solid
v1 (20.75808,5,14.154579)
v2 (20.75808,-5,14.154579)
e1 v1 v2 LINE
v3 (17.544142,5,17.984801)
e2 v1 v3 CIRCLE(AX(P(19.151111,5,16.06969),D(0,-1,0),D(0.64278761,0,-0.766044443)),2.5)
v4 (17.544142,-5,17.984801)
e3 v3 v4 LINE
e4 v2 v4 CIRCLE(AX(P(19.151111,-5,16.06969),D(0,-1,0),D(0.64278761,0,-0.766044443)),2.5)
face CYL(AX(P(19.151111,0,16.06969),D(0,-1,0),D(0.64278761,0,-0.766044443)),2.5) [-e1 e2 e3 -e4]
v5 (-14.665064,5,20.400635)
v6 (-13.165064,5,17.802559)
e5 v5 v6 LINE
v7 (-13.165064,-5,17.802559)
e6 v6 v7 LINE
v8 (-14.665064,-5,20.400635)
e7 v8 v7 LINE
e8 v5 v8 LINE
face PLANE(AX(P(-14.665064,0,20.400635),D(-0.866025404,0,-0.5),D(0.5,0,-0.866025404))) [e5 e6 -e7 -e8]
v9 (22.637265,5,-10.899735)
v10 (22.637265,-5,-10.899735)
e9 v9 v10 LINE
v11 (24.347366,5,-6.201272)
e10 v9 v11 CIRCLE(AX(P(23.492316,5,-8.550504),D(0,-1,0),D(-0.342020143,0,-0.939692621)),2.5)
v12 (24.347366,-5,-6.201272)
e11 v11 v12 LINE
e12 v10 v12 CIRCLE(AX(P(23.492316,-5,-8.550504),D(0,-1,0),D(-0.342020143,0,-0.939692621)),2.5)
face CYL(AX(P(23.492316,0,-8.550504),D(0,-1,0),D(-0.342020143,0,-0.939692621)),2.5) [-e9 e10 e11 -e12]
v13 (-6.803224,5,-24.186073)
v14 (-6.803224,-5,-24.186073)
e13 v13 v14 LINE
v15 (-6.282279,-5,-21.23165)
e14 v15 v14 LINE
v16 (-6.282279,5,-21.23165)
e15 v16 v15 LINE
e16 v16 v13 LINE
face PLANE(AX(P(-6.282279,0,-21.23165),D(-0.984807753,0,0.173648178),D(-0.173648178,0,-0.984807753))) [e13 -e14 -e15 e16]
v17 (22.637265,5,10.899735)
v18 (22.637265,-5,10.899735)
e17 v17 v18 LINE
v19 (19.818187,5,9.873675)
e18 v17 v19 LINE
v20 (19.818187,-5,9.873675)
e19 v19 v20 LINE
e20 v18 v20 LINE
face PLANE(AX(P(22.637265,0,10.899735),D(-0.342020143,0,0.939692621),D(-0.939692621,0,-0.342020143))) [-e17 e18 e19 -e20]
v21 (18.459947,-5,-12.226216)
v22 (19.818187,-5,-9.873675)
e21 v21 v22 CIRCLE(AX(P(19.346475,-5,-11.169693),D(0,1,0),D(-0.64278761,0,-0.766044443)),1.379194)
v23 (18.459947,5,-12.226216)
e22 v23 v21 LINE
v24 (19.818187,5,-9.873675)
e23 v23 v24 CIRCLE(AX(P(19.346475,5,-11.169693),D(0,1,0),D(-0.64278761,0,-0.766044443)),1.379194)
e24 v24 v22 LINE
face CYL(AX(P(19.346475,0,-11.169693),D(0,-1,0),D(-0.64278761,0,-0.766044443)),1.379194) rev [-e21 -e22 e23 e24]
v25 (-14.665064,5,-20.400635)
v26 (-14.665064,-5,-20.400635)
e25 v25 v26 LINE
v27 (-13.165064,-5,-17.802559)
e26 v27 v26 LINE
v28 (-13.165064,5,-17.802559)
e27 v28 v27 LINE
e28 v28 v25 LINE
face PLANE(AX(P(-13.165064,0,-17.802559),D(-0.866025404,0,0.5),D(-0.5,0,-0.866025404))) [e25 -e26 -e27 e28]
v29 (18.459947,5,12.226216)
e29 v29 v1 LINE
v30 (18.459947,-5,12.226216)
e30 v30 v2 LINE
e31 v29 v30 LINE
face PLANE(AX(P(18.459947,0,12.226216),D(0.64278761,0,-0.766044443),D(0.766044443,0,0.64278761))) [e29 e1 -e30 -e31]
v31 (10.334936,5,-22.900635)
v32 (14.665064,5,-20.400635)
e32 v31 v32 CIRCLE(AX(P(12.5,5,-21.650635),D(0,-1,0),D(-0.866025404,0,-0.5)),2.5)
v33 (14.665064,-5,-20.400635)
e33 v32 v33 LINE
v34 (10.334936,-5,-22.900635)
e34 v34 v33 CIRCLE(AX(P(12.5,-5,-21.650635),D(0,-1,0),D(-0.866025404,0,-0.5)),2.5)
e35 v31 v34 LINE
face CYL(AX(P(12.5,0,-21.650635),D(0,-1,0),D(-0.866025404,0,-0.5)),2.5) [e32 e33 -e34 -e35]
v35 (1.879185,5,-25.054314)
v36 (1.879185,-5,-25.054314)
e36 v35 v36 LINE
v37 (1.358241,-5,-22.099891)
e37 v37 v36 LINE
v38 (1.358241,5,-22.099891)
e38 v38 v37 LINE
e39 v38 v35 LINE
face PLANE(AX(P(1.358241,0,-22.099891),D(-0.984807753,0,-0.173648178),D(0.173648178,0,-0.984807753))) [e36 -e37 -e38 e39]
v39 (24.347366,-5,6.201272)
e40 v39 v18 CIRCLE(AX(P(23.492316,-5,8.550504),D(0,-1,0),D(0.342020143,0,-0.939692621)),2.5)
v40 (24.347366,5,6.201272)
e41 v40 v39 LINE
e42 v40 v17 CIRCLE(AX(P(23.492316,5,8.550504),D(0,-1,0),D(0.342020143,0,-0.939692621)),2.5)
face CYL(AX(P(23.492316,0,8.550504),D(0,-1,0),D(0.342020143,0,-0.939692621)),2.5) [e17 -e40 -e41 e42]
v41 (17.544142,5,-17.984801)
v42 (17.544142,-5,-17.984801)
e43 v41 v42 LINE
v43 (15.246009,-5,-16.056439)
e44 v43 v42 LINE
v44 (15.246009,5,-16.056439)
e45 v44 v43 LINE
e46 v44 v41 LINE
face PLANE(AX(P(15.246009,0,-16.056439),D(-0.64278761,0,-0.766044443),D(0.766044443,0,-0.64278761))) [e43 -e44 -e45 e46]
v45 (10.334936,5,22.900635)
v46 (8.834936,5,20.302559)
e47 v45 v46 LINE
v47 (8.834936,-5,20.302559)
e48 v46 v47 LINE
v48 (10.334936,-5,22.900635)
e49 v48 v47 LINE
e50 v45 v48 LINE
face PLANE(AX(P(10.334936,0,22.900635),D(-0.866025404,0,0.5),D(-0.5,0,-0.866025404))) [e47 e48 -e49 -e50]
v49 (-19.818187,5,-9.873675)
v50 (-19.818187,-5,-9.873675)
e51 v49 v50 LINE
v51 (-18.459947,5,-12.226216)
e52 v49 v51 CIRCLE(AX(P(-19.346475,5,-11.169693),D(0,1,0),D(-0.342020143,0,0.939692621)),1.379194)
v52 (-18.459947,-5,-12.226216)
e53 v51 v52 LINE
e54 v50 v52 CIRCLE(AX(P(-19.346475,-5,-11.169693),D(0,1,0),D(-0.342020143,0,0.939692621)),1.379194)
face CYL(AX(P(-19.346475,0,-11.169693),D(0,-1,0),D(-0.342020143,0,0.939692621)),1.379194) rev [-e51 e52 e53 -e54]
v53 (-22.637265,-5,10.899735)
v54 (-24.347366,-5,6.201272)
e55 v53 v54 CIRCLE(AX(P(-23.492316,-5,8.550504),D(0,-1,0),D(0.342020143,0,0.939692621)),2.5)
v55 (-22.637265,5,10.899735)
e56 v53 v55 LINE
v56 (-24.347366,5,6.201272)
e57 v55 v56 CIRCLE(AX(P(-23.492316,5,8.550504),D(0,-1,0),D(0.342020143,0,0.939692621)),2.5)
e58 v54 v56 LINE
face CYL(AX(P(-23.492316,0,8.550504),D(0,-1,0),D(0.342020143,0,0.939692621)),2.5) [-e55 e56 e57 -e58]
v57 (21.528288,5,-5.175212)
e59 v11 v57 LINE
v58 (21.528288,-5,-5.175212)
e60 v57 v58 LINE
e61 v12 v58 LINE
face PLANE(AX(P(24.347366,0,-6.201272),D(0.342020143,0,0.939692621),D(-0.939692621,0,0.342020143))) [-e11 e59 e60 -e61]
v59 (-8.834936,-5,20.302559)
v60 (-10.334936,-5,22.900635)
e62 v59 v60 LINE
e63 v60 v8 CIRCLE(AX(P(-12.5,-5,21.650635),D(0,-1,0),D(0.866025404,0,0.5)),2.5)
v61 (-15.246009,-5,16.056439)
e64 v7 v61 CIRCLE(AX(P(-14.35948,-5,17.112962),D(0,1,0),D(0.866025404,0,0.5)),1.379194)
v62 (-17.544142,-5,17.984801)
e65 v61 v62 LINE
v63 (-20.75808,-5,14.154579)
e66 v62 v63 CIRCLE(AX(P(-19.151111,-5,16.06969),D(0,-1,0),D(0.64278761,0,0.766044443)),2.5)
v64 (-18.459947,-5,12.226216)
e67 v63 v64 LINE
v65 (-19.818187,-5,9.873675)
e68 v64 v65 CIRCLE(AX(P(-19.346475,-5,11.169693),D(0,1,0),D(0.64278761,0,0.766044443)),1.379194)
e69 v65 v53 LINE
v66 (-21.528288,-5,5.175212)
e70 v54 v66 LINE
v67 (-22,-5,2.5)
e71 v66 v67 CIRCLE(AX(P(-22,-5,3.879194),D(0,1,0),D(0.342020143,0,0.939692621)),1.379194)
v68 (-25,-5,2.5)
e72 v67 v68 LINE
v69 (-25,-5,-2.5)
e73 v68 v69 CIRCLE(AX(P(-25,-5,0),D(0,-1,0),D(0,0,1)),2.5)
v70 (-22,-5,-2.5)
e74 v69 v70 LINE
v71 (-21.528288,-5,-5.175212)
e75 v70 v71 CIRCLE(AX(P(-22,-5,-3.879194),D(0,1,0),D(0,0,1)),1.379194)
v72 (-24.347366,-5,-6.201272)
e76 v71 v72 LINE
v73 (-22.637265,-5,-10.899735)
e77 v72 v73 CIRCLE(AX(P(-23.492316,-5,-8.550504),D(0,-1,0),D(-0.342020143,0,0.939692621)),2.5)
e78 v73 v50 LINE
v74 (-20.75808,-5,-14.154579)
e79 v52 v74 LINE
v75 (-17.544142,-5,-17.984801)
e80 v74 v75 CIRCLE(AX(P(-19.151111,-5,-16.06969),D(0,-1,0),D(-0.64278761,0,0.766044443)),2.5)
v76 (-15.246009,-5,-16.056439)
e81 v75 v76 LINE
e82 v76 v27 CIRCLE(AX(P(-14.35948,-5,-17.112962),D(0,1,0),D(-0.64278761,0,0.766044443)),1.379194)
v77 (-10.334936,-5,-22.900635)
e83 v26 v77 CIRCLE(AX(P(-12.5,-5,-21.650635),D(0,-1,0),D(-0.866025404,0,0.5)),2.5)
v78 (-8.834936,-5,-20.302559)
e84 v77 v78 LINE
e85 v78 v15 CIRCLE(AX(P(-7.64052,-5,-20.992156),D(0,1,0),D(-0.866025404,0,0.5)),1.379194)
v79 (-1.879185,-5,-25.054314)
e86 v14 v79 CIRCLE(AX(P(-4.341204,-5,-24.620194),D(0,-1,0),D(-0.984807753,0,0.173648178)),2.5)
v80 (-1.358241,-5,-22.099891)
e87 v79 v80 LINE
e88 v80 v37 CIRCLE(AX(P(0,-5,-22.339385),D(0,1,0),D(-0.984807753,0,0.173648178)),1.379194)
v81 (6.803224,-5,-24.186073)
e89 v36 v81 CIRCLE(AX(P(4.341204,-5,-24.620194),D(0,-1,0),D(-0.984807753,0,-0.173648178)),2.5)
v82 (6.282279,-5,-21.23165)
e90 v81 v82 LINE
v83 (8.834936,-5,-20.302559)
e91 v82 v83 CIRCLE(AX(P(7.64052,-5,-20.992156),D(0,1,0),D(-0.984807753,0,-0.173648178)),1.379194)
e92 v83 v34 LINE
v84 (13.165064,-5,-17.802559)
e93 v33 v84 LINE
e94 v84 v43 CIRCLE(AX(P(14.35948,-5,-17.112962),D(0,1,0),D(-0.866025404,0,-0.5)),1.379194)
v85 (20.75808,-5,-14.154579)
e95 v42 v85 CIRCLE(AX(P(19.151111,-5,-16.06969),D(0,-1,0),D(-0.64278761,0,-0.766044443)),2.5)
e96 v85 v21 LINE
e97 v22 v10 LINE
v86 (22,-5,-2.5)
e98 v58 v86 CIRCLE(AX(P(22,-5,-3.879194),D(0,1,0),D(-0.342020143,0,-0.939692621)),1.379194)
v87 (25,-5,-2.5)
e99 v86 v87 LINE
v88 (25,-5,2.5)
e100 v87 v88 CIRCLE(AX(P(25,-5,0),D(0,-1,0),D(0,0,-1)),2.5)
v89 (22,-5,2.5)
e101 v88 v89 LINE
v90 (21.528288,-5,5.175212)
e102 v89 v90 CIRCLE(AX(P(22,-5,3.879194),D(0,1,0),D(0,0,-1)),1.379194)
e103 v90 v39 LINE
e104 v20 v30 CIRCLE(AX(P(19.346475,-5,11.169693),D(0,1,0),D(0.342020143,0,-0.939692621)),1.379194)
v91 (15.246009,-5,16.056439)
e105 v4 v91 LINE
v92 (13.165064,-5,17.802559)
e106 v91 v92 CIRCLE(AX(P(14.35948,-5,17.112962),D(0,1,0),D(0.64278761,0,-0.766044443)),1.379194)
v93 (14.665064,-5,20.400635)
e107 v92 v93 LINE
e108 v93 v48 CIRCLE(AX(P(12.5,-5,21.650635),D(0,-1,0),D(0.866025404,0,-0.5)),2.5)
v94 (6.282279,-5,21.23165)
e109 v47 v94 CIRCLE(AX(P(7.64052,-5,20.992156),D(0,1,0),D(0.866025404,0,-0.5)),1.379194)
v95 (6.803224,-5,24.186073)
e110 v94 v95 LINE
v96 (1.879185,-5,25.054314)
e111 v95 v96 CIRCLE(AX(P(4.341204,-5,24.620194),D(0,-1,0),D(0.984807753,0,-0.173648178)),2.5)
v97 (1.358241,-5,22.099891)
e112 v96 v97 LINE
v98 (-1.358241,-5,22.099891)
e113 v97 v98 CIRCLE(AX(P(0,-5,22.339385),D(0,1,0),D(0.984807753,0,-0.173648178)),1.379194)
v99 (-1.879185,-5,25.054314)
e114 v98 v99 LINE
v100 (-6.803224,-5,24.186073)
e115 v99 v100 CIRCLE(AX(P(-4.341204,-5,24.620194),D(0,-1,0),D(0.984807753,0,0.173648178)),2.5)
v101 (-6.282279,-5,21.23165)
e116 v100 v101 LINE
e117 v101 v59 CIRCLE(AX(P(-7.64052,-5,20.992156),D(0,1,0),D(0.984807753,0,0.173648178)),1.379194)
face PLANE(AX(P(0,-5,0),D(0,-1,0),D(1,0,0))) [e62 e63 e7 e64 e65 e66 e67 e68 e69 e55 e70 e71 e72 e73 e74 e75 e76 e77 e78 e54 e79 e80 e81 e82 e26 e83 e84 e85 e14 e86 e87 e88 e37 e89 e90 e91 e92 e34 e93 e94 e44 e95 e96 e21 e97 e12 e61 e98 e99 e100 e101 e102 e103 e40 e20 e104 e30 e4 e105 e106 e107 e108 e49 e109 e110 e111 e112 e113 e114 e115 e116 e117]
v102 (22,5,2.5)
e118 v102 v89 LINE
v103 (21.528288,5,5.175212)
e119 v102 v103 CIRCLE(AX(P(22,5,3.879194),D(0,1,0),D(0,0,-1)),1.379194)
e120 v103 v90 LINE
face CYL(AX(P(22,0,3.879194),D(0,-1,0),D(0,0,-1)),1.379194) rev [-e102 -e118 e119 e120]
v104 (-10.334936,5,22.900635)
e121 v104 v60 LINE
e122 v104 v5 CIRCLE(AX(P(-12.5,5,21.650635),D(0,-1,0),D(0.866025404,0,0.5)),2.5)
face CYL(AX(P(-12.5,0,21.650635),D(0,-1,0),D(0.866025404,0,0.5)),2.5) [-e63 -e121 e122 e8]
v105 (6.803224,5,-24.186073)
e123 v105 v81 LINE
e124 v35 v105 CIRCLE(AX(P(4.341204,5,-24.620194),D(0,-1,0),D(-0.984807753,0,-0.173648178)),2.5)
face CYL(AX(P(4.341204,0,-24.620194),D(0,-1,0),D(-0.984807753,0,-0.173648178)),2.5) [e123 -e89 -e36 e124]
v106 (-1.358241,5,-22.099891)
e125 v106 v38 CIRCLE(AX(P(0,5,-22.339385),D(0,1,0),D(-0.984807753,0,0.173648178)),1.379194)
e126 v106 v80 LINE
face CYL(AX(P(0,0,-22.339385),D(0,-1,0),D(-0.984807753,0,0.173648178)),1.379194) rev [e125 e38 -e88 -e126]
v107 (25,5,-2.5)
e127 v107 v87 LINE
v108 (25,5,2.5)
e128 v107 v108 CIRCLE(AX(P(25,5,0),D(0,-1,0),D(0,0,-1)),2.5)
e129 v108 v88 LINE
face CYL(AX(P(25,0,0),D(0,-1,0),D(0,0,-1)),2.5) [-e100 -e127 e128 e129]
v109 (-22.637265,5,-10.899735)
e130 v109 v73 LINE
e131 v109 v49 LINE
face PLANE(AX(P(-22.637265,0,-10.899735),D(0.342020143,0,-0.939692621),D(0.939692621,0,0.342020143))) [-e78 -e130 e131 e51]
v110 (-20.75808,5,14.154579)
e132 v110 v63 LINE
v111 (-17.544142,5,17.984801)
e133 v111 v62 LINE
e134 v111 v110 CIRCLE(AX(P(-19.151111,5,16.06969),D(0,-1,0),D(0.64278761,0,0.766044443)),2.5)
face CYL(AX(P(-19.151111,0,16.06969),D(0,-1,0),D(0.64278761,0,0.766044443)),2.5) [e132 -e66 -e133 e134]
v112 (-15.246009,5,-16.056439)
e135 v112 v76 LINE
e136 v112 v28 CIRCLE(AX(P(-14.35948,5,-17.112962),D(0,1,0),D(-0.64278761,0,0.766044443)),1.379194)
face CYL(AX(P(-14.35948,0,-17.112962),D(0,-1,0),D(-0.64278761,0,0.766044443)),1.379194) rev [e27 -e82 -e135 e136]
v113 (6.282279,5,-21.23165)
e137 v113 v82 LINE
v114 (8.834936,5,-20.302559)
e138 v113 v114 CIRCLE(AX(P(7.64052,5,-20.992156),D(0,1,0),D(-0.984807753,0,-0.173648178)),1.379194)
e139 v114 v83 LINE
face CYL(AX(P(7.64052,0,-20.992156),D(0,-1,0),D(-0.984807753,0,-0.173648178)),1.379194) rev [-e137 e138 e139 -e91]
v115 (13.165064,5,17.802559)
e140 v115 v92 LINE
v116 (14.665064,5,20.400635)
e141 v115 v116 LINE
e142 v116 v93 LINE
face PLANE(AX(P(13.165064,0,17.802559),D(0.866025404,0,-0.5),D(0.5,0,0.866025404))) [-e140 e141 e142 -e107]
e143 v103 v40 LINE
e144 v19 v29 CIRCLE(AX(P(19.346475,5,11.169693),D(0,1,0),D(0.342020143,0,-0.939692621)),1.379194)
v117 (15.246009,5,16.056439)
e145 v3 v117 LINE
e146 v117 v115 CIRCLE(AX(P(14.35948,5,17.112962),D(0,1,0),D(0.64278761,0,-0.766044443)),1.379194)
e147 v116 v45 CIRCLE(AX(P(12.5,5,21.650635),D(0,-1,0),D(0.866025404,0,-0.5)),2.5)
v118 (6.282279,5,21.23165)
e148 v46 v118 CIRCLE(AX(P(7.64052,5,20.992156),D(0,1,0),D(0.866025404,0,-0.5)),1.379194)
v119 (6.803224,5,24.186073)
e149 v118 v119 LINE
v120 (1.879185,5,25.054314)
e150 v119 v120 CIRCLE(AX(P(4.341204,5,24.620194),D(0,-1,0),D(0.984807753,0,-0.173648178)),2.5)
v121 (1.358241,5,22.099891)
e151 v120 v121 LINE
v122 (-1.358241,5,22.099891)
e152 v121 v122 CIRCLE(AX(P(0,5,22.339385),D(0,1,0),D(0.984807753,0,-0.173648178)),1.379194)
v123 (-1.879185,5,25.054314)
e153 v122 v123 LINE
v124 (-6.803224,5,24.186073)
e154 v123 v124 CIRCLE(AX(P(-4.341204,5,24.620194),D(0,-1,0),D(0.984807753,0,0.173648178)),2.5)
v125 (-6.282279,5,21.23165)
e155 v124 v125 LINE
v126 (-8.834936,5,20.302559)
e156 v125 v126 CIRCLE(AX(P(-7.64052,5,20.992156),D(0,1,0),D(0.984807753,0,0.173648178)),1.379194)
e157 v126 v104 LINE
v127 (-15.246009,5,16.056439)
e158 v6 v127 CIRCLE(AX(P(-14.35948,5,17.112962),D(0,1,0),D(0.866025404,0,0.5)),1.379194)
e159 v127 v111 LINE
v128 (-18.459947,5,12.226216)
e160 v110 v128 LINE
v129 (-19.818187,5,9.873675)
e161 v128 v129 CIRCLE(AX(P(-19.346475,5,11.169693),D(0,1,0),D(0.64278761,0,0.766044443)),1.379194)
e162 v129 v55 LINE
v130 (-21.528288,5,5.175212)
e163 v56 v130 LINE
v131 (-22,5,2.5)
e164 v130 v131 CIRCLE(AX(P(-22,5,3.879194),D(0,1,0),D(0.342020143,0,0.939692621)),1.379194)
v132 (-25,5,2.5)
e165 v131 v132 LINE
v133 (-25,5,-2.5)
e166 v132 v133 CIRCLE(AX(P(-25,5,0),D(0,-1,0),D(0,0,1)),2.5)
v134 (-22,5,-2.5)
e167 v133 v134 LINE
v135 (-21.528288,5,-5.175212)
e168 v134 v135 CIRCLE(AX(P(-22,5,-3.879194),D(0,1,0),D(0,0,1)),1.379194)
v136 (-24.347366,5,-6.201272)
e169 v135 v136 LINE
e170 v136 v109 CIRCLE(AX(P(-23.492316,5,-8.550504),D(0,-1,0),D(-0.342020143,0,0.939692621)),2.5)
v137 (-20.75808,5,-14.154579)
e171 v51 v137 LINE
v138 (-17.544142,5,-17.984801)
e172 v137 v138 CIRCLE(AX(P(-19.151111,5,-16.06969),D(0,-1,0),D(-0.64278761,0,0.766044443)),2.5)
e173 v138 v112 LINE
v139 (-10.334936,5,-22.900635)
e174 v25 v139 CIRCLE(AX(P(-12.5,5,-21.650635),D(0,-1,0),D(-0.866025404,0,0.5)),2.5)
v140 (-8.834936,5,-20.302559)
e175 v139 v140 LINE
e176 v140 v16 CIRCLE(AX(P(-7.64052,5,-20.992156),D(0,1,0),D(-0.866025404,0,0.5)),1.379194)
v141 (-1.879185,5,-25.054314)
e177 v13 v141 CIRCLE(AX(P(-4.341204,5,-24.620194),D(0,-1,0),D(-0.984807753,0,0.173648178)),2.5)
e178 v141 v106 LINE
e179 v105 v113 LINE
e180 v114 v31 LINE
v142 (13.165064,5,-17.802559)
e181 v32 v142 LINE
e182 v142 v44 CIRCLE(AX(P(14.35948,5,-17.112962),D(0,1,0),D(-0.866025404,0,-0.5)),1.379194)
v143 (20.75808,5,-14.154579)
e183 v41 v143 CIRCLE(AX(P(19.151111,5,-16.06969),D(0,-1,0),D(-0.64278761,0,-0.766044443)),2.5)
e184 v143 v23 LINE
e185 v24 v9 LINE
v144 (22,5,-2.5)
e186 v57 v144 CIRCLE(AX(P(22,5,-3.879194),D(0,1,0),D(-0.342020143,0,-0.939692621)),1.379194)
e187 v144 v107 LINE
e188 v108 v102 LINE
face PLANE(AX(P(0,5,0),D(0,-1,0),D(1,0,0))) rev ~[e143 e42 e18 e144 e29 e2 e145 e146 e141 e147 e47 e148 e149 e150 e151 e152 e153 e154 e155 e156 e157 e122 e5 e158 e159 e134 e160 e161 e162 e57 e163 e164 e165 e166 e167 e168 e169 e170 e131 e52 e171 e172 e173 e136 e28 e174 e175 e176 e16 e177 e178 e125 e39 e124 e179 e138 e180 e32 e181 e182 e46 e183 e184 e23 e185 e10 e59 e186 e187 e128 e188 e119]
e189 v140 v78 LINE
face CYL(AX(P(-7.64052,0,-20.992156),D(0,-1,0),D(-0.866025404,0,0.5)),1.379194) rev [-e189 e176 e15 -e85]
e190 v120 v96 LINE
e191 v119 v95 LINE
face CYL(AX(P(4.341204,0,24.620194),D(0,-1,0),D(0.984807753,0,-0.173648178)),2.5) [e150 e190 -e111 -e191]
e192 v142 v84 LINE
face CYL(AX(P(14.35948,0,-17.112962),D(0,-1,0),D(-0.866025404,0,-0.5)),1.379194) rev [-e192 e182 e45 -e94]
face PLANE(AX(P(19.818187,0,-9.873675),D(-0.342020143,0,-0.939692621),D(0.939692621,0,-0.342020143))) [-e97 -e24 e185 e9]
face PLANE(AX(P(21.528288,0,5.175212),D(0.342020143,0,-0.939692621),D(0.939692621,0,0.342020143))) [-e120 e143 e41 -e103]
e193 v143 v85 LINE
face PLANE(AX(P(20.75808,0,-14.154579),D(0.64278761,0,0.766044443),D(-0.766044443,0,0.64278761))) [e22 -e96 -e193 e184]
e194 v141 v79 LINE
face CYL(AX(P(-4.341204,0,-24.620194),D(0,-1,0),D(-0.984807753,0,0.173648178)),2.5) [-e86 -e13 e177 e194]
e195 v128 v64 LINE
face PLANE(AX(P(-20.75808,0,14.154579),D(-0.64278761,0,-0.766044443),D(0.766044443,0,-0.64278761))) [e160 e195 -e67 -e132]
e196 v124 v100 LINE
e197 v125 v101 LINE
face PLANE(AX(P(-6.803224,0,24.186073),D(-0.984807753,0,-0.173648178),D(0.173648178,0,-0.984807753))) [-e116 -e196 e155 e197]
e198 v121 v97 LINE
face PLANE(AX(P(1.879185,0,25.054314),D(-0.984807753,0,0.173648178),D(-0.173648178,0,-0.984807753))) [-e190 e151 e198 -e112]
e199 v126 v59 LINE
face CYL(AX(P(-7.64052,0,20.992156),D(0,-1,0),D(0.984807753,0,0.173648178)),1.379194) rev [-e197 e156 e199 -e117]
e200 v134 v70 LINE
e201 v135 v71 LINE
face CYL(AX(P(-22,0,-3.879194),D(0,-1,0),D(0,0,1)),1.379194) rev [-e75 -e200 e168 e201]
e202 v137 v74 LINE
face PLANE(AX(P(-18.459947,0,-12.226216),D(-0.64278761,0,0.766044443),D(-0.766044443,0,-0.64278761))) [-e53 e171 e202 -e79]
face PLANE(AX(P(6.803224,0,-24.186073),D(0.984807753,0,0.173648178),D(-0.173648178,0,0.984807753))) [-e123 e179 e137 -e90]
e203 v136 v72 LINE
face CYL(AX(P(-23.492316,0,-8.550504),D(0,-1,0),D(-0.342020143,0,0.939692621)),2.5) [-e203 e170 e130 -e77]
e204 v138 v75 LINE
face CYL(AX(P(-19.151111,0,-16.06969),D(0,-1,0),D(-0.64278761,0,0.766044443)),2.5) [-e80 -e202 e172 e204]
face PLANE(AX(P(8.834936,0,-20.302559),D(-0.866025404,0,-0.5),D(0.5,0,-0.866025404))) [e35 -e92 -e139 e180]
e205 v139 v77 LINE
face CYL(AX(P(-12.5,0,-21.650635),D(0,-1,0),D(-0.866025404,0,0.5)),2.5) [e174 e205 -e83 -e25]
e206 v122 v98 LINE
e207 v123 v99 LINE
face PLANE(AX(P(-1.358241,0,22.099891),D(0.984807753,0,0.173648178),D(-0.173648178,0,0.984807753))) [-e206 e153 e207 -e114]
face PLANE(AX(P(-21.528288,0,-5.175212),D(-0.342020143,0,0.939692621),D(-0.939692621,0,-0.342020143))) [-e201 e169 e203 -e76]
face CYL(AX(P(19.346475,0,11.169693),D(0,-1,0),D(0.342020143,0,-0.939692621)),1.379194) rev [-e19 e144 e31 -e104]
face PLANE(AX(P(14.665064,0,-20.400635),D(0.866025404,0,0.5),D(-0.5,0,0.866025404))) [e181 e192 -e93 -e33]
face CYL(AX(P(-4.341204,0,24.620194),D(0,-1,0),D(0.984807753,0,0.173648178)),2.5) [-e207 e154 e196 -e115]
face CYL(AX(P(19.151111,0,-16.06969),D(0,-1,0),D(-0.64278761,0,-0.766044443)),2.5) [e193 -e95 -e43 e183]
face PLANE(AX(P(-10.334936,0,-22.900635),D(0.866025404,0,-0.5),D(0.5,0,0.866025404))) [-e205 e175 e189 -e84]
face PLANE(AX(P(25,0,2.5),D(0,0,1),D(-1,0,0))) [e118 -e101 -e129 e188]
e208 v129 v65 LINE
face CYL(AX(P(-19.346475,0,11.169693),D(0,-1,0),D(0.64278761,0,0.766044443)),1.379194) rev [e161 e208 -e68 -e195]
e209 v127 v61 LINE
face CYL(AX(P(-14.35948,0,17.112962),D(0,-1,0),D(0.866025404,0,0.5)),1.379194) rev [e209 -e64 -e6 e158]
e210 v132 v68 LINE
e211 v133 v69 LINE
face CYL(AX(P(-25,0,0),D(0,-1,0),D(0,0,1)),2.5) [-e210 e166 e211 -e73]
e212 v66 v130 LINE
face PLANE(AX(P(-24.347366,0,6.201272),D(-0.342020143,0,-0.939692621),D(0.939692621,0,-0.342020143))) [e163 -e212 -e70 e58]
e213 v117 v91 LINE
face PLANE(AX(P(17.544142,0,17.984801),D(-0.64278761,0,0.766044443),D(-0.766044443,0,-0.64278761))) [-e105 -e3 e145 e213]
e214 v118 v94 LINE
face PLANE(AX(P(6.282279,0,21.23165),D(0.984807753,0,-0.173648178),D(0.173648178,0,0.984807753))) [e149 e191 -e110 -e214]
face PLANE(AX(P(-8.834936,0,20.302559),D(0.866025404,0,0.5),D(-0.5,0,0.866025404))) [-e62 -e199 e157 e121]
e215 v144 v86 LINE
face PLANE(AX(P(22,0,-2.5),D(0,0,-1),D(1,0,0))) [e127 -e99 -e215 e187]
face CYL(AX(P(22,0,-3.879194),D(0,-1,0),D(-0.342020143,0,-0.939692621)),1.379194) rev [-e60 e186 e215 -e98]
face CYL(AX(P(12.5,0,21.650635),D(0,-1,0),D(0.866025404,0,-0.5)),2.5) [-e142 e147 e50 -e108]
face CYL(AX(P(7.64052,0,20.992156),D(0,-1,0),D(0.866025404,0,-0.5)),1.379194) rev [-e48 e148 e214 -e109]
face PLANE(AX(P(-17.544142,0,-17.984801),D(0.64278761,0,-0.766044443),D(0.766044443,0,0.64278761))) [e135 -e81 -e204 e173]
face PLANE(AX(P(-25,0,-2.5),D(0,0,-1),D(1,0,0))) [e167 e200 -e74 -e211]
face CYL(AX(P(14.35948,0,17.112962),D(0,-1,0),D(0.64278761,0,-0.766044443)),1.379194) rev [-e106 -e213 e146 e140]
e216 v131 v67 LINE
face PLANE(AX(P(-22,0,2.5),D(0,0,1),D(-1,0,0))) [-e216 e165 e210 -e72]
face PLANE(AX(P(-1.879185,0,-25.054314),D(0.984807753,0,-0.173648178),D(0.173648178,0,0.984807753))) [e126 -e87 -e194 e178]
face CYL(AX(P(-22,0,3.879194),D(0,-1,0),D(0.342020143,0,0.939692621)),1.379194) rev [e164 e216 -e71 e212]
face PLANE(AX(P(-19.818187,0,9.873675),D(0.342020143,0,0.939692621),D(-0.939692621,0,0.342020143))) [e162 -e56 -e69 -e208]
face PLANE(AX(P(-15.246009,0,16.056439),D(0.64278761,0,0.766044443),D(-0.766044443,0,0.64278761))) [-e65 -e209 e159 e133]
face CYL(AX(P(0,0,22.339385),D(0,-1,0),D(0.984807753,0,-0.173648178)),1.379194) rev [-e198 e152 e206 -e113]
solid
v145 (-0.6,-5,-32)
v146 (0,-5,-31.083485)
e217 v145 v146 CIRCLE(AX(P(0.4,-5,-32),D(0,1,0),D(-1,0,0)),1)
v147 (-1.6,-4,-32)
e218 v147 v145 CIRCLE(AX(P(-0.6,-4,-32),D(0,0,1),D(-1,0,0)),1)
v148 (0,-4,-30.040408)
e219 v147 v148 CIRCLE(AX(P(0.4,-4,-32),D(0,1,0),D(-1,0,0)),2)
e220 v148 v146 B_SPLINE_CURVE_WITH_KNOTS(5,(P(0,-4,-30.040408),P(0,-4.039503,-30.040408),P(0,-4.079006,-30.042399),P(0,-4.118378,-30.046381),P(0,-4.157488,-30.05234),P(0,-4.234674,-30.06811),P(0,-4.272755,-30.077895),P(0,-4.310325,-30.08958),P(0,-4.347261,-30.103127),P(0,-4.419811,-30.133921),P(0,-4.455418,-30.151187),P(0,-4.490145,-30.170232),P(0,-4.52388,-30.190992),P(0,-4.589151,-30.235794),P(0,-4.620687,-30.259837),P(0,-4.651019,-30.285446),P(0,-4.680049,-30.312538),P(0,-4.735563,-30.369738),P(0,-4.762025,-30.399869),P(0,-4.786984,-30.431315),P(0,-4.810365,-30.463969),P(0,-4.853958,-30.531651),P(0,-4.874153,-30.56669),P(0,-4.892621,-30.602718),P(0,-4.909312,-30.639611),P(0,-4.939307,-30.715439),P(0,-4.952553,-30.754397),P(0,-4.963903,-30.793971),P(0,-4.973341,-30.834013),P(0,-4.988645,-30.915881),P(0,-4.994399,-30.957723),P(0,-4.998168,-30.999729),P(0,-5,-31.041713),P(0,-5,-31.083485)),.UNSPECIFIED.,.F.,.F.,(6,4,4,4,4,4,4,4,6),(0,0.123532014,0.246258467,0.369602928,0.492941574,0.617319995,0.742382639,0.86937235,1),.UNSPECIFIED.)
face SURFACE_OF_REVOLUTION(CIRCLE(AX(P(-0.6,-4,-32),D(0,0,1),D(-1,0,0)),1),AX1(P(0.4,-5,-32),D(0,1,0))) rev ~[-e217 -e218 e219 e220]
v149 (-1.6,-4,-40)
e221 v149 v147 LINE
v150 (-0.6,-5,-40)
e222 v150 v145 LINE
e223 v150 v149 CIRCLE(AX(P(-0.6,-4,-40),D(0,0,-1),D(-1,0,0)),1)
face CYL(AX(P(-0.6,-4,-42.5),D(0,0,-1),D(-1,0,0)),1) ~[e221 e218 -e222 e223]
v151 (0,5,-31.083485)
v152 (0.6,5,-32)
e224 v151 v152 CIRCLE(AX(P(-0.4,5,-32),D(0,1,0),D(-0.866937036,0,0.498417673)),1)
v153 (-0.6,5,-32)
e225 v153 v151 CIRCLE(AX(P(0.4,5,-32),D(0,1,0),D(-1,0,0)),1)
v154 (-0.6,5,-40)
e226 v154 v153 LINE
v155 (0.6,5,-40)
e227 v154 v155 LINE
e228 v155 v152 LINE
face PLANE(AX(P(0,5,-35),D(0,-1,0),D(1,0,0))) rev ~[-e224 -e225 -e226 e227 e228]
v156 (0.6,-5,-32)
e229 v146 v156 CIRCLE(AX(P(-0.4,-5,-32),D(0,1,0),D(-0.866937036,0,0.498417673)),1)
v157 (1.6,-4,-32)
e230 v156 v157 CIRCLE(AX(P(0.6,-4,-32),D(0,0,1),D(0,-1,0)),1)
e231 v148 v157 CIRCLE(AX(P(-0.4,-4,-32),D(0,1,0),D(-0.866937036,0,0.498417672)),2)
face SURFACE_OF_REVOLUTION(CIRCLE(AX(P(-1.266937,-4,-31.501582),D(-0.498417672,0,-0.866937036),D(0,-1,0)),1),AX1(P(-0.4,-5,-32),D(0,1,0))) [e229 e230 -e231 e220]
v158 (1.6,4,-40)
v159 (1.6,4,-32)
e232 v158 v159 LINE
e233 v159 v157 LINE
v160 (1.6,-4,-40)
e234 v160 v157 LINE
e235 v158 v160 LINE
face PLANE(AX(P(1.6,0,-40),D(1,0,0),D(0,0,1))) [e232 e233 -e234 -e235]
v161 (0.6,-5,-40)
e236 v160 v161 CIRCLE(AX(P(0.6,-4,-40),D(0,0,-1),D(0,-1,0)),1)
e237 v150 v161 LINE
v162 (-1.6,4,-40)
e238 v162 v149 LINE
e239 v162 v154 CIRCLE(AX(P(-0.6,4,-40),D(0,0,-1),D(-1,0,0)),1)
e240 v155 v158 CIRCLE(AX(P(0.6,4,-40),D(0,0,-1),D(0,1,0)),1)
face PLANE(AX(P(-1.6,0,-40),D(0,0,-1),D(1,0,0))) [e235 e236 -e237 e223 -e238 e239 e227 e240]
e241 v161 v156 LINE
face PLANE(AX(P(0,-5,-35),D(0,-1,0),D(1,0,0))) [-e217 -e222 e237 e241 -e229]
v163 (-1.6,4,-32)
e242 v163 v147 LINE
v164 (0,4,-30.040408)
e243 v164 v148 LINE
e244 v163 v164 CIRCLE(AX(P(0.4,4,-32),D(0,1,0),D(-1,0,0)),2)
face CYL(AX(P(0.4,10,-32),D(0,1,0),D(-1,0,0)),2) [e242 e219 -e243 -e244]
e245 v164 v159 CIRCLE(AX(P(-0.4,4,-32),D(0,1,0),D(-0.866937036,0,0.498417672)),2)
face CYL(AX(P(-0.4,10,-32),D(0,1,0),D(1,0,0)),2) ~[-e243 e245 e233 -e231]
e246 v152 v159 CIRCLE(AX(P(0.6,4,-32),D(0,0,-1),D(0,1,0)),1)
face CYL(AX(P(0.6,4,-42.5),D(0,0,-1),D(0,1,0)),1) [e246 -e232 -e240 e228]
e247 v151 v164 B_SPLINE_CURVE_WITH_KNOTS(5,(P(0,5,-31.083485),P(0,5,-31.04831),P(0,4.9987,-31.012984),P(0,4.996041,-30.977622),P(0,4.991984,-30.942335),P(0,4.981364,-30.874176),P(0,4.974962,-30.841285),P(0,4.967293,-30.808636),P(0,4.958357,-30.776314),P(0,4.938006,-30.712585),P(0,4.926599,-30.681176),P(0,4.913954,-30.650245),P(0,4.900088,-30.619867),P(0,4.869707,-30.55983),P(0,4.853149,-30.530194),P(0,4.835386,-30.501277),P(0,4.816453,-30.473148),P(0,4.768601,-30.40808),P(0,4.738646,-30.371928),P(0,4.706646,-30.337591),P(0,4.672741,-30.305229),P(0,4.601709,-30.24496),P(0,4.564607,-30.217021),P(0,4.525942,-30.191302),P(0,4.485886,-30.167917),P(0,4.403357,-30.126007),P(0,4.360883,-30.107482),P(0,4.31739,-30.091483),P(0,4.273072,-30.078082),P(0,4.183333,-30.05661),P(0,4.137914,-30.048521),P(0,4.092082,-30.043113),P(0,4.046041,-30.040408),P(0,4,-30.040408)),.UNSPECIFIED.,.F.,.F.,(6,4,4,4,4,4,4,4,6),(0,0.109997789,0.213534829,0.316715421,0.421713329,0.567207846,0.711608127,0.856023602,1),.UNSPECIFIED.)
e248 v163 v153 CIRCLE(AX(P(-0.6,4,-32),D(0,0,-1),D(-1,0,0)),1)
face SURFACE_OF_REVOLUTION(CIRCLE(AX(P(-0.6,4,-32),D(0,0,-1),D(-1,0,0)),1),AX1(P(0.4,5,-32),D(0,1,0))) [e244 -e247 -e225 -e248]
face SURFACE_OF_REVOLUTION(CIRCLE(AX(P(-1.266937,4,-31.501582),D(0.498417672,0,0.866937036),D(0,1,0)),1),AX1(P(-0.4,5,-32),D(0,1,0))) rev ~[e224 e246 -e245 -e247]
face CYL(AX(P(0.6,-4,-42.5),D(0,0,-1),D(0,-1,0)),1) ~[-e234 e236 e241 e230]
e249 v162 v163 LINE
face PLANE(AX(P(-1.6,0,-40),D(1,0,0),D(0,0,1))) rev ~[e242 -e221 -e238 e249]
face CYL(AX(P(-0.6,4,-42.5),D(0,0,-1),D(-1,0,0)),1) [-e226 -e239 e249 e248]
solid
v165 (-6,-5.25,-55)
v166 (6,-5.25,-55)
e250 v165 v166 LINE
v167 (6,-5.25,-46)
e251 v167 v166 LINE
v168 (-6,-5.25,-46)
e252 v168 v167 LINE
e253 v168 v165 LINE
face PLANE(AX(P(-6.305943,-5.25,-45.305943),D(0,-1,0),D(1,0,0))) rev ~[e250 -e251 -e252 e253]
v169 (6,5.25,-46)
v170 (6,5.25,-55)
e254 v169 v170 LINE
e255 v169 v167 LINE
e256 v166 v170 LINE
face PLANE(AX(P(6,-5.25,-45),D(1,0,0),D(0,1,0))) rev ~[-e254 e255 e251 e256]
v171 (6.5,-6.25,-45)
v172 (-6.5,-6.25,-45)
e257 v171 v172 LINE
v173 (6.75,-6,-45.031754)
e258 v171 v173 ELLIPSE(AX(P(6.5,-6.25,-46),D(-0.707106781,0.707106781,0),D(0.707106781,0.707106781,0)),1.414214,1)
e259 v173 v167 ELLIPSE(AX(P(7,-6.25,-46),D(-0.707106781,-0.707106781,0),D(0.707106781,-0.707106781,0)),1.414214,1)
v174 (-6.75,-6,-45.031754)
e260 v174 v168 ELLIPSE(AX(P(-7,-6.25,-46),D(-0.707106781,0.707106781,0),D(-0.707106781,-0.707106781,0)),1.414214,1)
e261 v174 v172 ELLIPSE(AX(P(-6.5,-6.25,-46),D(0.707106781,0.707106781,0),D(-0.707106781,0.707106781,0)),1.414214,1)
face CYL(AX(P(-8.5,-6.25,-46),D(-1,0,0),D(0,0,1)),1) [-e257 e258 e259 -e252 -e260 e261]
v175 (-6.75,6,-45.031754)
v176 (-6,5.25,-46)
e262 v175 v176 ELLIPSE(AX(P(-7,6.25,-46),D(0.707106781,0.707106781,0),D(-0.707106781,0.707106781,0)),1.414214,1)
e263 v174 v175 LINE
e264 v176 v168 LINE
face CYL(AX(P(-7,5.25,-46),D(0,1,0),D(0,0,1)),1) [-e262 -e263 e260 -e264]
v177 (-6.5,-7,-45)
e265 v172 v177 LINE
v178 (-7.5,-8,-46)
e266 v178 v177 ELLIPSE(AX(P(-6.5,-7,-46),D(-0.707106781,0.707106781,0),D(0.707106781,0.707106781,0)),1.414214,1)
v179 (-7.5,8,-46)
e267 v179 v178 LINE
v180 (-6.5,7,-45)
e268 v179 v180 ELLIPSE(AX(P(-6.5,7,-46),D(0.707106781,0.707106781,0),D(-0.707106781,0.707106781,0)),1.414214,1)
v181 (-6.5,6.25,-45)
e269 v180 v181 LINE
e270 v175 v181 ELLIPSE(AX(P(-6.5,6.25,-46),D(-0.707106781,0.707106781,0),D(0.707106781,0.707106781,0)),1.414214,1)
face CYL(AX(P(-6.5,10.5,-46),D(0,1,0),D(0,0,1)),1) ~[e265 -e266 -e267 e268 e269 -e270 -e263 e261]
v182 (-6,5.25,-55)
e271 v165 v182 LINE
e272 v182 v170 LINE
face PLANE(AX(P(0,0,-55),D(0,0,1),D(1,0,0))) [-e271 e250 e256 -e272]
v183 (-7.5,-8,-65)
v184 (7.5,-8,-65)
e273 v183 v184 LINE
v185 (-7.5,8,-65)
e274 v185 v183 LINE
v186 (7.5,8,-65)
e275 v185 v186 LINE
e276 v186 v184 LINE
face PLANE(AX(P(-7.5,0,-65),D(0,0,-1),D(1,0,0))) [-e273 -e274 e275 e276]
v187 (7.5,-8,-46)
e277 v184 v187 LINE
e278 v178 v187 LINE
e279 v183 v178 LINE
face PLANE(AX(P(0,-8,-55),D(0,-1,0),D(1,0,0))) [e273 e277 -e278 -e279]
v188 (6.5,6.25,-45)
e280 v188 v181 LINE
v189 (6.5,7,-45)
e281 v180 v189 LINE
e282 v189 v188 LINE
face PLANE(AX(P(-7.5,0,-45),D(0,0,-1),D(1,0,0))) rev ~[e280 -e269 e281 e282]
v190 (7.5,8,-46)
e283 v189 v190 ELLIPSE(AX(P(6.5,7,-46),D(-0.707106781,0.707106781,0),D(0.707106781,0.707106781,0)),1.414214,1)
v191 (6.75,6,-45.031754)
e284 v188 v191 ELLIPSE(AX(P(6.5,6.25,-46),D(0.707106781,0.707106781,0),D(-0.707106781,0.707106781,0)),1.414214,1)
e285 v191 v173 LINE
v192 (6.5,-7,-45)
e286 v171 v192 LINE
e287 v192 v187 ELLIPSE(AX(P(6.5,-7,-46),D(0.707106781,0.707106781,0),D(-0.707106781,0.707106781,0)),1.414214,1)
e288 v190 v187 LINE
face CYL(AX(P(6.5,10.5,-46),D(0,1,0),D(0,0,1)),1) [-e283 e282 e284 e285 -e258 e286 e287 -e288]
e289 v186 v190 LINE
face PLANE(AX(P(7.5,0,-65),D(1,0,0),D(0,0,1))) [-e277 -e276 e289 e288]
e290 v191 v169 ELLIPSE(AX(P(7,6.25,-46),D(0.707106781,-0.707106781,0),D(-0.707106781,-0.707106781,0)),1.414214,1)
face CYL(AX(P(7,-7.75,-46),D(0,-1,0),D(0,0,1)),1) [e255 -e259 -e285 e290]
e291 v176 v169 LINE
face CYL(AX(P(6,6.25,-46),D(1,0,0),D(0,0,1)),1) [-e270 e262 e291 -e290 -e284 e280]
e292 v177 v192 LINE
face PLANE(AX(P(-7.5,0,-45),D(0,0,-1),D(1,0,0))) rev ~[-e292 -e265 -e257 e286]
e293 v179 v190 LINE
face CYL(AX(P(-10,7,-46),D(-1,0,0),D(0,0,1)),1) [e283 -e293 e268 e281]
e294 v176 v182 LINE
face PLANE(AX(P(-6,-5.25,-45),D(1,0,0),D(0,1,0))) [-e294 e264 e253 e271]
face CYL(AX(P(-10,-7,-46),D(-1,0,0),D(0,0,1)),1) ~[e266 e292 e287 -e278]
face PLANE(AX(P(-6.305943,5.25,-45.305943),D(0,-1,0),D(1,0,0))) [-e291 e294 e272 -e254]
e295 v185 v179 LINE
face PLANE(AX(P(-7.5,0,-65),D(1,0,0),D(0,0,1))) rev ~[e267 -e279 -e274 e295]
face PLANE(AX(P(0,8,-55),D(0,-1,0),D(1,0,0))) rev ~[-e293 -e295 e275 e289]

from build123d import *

# Parameters (mm, degrees)
F1_DEPTH      = 5
F1_DEPTH_BACK = 5
F2_W          = 3.2
F2_H          = 10
F3_DEPTH      = 5
F3_DEPTH_BACK = 5
F4_T1_DEPTH   = 20
F5_T1_DEPTH   = 10.5
F5_T4_ANGLE   = 150.1046308582
F5_T6_ANGLE   = 150.1046308582
F5_T8_ANGLE   = 150.1046308582
F5_T10_ANGLE  = 150.1046308582
F6_W          = 15
F6_H          = 20
F7_DEPTH      = 8
F7_DEPTH_BACK = 8
F8_W          = 12
F8_H          = 10.5
F9_DEPTH      = 10
F10_T1_DEPTH  = 21
F10_T3_DEPTH  = 20
F10_T5_DEPTH  = 10.5
F10_T7_DEPTH  = 12
F10_T13_DEPTH = 13
F10_T17_DEPTH = 14.5
F10_T24_DEPTH = 13
F10_T28_DEPTH = 14.5
F10_T35_DEPTH = 14.5
F10_T39_DEPTH = 13
F10_T46_DEPTH = 13
F10_T50_DEPTH = 14.5


# Not quite as in the source:
# - a fillet or chamfer that OpenCascade refuses, or shapes differently, is made with other operations: its cross-section is extruded or revolved along the edge and cut away or added


with BuildPart() as f1:
    # F0 (on Front) → F1 (new body, two sides)
    with BuildSketch(Plane.XZ) as f1_sk:
        with BuildLine():
            ThreePointArc((-21.5282880156, 5.1752116012), (-20.6417594739, 3.6396991245), (-22, 2.5))
            Line((-22, 2.5), (-25, 2.5))
            ThreePointArc((-25, 2.5), (-27.5, 0), (-25, -2.5))
            Line((-25, -2.5), (-22, -2.5))
            ThreePointArc((-22, -2.5), (-20.6417594739, -3.6396991245), (-21.5282880156, -5.1752116012))
            Line((-21.5282880156, -5.1752116012), (-24.347365878, -6.2012720312))
            ThreePointArc((-24.347365878, -6.2012720312), (-25.8415470716, -9.4055539415), (-22.6372651613, -10.8997351351))
            Line((-22.6372651613, -10.8997351351), (-19.818187299, -9.8736747051))
            ThreePointArc((-19.818187299, -9.8736747051), (-18.1520586414, -10.480095943), (-18.4599467728, -12.2262163053))
            Line((-18.4599467728, -12.2262163053), (-20.7580801022, -14.1545791344))
            ThreePointArc((-20.7580801022, -14.1545791344), (-21.0662221858, -17.6766592664), (-17.5441420538, -17.98480135))
            Line((-17.5441420538, -17.98480135), (-15.2460087244, -16.0564385209))
            ThreePointArc((-15.2460087244, -16.0564385209), (-13.4729516409, -16.0564385209), (-13.1650635095, -17.8025588833))
            Line((-13.1650635095, -17.8025588833), (-14.6650635095, -20.4006350946))
            ThreePointArc((-14.6650635095, -20.4006350946), (-13.75, -23.8156986041), (-10.3349364905, -22.9006350946))
            Line((-10.3349364905, -22.9006350946), (-8.8349364905, -20.3025588833))
            ThreePointArc((-8.8349364905, -20.3025588833), (-7.1688078329, -19.6961376454), (-6.2822792912, -21.2316501221))
            Line((-6.2822792912, -21.2316501221), (-6.8032238242, -24.1860733811))
            ThreePointArc((-6.8032238242, -24.1860733811), (-4.7753248858, -27.0822132078), (-1.8791850591, -25.0543142695))
            Line((-1.8791850591, -25.0543142695), (-1.3582405261, -22.0998910104))
            ThreePointArc((-1.3582405261, -22.0998910104), (0, -20.9601918859), (1.3582405261, -22.0998910104))
            Line((1.3582405261, -22.0998910104), (1.8791850591, -25.0543142695))
            ThreePointArc((1.8791850591, -25.0543142695), (4.7753248858, -27.0822132078), (6.8032238242, -24.1860733811))
            Line((6.8032238242, -24.1860733811), (6.2822792912, -21.2316501221))
            ThreePointArc((6.2822792912, -21.2316501221), (7.1688078329, -19.6961376454), (8.8349364905, -20.3025588833))
            Line((8.8349364905, -20.3025588833), (10.3349364905, -22.9006350946))
            ThreePointArc((10.3349364905, -22.9006350946), (13.75, -23.8156986041), (14.6650635095, -20.4006350946))
            Line((14.6650635095, -20.4006350946), (13.1650635095, -17.8025588833))
            ThreePointArc((13.1650635095, -17.8025588833), (13.4729516409, -16.0564385209), (15.2460087244, -16.0564385209))
            Line((15.2460087244, -16.0564385209), (17.5441420538, -17.98480135))
            ThreePointArc((17.5441420538, -17.98480135), (21.0662221858, -17.6766592664), (20.7580801022, -14.1545791344))
            Line((20.7580801022, -14.1545791344), (18.4599467728, -12.2262163053))
            ThreePointArc((18.4599467728, -12.2262163053), (18.1520586414, -10.480095943), (19.818187299, -9.8736747051))
            Line((19.818187299, -9.8736747051), (22.6372651613, -10.8997351351))
            ThreePointArc((22.6372651613, -10.8997351351), (25.8415470716, -9.4055539415), (24.347365878, -6.2012720312))
            Line((24.347365878, -6.2012720312), (21.5282880156, -5.1752116012))
            ThreePointArc((21.5282880156, -5.1752116012), (20.6417594739, -3.6396991245), (22, -2.5))
            Line((22, -2.5), (25, -2.5))
            ThreePointArc((25, -2.5), (27.5, 0), (25, 2.5))
            Line((25, 2.5), (22, 2.5))
            ThreePointArc((22, 2.5), (20.6417594739, 3.6396991245), (21.5282880156, 5.1752116012))
            Line((21.5282880156, 5.1752116012), (24.347365878, 6.2012720312))
            ThreePointArc((24.347365878, 6.2012720312), (25.8415470716, 9.4055539415), (22.6372651613, 10.8997351351))
            Line((22.6372651613, 10.8997351351), (19.818187299, 9.8736747051))
            ThreePointArc((19.818187299, 9.8736747051), (18.1520586414, 10.480095943), (18.4599467728, 12.2262163053))
            Line((18.4599467728, 12.2262163053), (20.7580801022, 14.1545791344))
            ThreePointArc((20.7580801022, 14.1545791344), (21.0662221858, 17.6766592664), (17.5441420538, 17.98480135))
            Line((17.5441420538, 17.98480135), (15.2460087244, 16.0564385209))
            ThreePointArc((15.2460087244, 16.0564385209), (13.4729516409, 16.0564385209), (13.1650635095, 17.8025588833))
            Line((13.1650635095, 17.8025588833), (14.6650635095, 20.4006350946))
            ThreePointArc((14.6650635095, 20.4006350946), (13.75, 23.8156986041), (10.3349364905, 22.9006350946))
            Line((10.3349364905, 22.9006350946), (8.8349364905, 20.3025588833))
            ThreePointArc((8.8349364905, 20.3025588833), (7.1688078329, 19.6961376454), (6.2822792912, 21.2316501221))
            Line((6.2822792912, 21.2316501221), (6.8032238242, 24.1860733811))
            ThreePointArc((6.8032238242, 24.1860733811), (4.7753248858, 27.0822132078), (1.8791850591, 25.0543142695))
            Line((1.8791850591, 25.0543142695), (1.3582405261, 22.0998910104))
            ThreePointArc((1.3582405261, 22.0998910104), (0, 20.9601918859), (-1.3582405261, 22.0998910104))
            Line((-1.3582405261, 22.0998910104), (-1.8791850591, 25.0543142695))
            ThreePointArc((-1.8791850591, 25.0543142695), (-4.7753248858, 27.0822132078), (-6.8032238242, 24.1860733811))
            Line((-6.8032238242, 24.1860733811), (-6.2822792912, 21.2316501221))
            ThreePointArc((-6.2822792912, 21.2316501221), (-7.1688078329, 19.6961376454), (-8.8349364905, 20.3025588833))
            Line((-8.8349364905, 20.3025588833), (-10.3349364905, 22.9006350946))
            ThreePointArc((-10.3349364905, 22.9006350946), (-13.75, 23.8156986041), (-14.6650635095, 20.4006350946))
            Line((-14.6650635095, 20.4006350946), (-13.1650635095, 17.8025588833))
            ThreePointArc((-13.1650635095, 17.8025588833), (-13.4729516409, 16.0564385209), (-15.2460087244, 16.0564385209))
            Line((-15.2460087244, 16.0564385209), (-17.5441420538, 17.98480135))
            ThreePointArc((-17.5441420538, 17.98480135), (-21.0662221858, 17.6766592664), (-20.7580801022, 14.1545791344))
            Line((-20.7580801022, 14.1545791344), (-18.4599467728, 12.2262163053))
            ThreePointArc((-18.4599467728, 12.2262163053), (-18.1520586414, 10.480095943), (-19.818187299, 9.8736747051))
            Line((-19.818187299, 9.8736747051), (-22.6372651613, 10.8997351351))
            ThreePointArc((-22.6372651613, 10.8997351351), (-25.8415470716, 9.4055539415), (-24.347365878, 6.2012720312))
            Line((-24.347365878, 6.2012720312), (-21.5282880156, 5.1752116012))
        make_face()
    extrude(amount=F1_DEPTH)
    extrude(f1_sk.sketch, amount=-F1_DEPTH_BACK)


with BuildPart() as f3:
    # F2 (on Front) → F3 (new body, two sides)
    with BuildSketch(Plane.XZ) as f3_sk:
        with Locations((0, -35)):
            Rectangle(F2_W, F2_H)
    extrude(amount=F3_DEPTH)
    extrude(f3_sk.sketch, amount=-F3_DEPTH_BACK)

    # F4: fillet of radius 2 on 2 edges, made by hand

    # F4_s2 → F4_t1 (cut)
    with BuildSketch(Plane.XZ.offset(-10)):
        with BuildLine():
            ThreePointArc((-1.6, -32), (-1.0142135624, -30.5857864376), (0.4, -30))
            Line((0.4, -30), (-1.6, -30))
            Line((-1.6, -30), (-1.6, -32))
        make_face()
        with BuildLine():
            ThreePointArc((1.6, -32), (1.0142135624, -30.5857864376), (-0.4, -30))
            Line((-0.4, -30), (1.6, -30))
            Line((1.6, -30), (1.6, -32))
        make_face()
    extrude(amount=F4_T1_DEPTH, mode=Mode.SUBTRACT)

    # F5: fillet of radius 1 on 4 edges, made by hand

    # F5_s2 → F5_t1 (cut)
    with BuildSketch(Plane.XY.offset(-42.5)):
        with BuildLine():
            ThreePointArc((-1.6, 4), (-1.3071067812, 4.7071067812), (-0.6, 5))
            Line((-0.6, 5), (-1.6, 5))
            Line((-1.6, 5), (-1.6, 4))
        make_face()
        with BuildLine():
            ThreePointArc((0.6, 5), (1.3071067812, 4.7071067812), (1.6, 4))
            Line((1.6, 4), (1.6, 5))
            Line((1.6, 5), (0.6, 5))
        make_face()
        with BuildLine():
            ThreePointArc((-1.6, -4), (-1.3071067812, -4.7071067812), (-0.6, -5))
            Line((-0.6, -5), (-1.6, -5))
            Line((-1.6, -5), (-1.6, -4))
        make_face()
        with BuildLine():
            ThreePointArc((0.6, -5), (1.3071067812, -4.7071067812), (1.6, -4))
            Line((1.6, -4), (1.6, -5))
            Line((1.6, -5), (0.6, -5))
        make_face()
    extrude(amount=F5_T1_DEPTH, mode=Mode.SUBTRACT)

    # F5_s3 → F5_t4 (revolve, cut)
    with BuildSketch(Plane(origin=(-13.9264637315, 0, -24.2233930604), x_dir=(0, 1, 0), z_dir=(-0.4984176723, 0, -0.8669370357))):
        with BuildLine():
            ThreePointArc((-5, 14.6025907008), (-4.7071067812, 13.8954839196), (-4, 13.6025907008))
            Line((-4, 13.6025907008), (-5, 13.6025907008))
            Line((-5, 13.6025907008), (-5, 14.6025907008))
        make_face()
    revolve(axis=Axis((-0.3999999999, -5, -31.9999999999), (0, 1, 0)), revolution_arc=F5_T4_ANGLE, mode=Mode.SUBTRACT)

    # F5_s5 → F5_t6 (revolve, cut)
    with BuildSketch(Plane.XY.offset(-31.9999999999)):
        with BuildLine():
            ThreePointArc((-1.6, -4), (-1.3071067812, -4.7071067812), (-0.6, -5))
            Line((-0.6, -5), (-1.6, -5))
            Line((-1.6, -5), (-1.6, -4))
        make_face()
    revolve(axis=Axis((0.3999999999, -5, -31.9999999999), (0, 1, 0)), revolution_arc=F5_T6_ANGLE, mode=Mode.SUBTRACT)

    # F5_s7 → F5_t8 (revolve, cut)
    with BuildSketch(Plane(origin=(-13.9264637315, 0, -24.2233930604), x_dir=(0, 1, 0), z_dir=(-0.4984176723, 0, -0.8669370357))):
        with BuildLine():
            ThreePointArc((5, 14.6025907008), (4.7071067812, 13.8954839196), (4, 13.6025907008))
            Line((4, 13.6025907008), (5, 13.6025907008))
            Line((5, 13.6025907008), (5, 14.6025907008))
        make_face()
    revolve(axis=Axis((-0.3999999999, 5, -31.9999999999), (0, 1, 0)), revolution_arc=F5_T8_ANGLE, mode=Mode.SUBTRACT)

    # F5_s9 → F5_t10 (revolve, cut)
    with BuildSketch(Plane.XY.offset(-31.9999999999)):
        with BuildLine():
            ThreePointArc((-1.6, 4), (-1.3071067812, 4.7071067812), (-0.6, 5))
            Line((-0.6, 5), (-1.6, 5))
            Line((-1.6, 5), (-1.6, 4))
        make_face()
    revolve(axis=Axis((0.3999999999, 5, -31.9999999999), (0, 1, 0)), revolution_arc=F5_T10_ANGLE, mode=Mode.SUBTRACT)


with BuildPart() as f7:
    # F6 (on Front) → F7 (new body, two sides)
    with BuildSketch(Plane.XZ) as f7_sk:
        with Locations((0, -55)):
            Rectangle(F6_W, F6_H)
    extrude(amount=F7_DEPTH)
    extrude(f7_sk.sketch, amount=-F7_DEPTH_BACK)

    # F8 (on face) → F9 (cut)
    with BuildSketch(Plane.XY.offset(-45)):
        Rectangle(F8_W, F8_H)
    extrude(amount=-F9_DEPTH, mode=Mode.SUBTRACT)

    # F10: fillet of radius 1 on 8 edges, made by hand

    # F10_s2 → F10_t1 (cut)
    with BuildSketch(Plane.XZ.offset(-10.5)):
        with BuildLine():
            ThreePointArc((6.5, -45), (7.2071067812, -45.2928932188), (7.5, -46))
            Line((7.5, -46), (7.5, -45))
            Line((7.5, -45), (6.5, -45))
        make_face()
        with BuildLine():
            ThreePointArc((-6.5, -45), (-7.2071067812, -45.2928932188), (-7.5, -46))
            Line((-7.5, -46), (-7.5, -45))
            Line((-7.5, -45), (-6.5, -45))
        make_face()
    extrude(amount=F10_T1_DEPTH, mode=Mode.SUBTRACT)

    # F10_s4 → F10_t3 (cut)
    with BuildSketch(Plane.YZ.offset(-10)):
        with BuildLine():
            ThreePointArc((-7, -45), (-7.7071067812, -45.2928932188), (-8, -46))
            Line((-8, -46), (-8, -45))
            Line((-8, -45), (-7, -45))
        make_face()
        with BuildLine():
            ThreePointArc((7, -45), (7.7071067812, -45.2928932188), (8, -46))
            Line((8, -46), (8, -45))
            Line((8, -45), (7, -45))
        make_face()
    extrude(amount=F10_T3_DEPTH, mode=Mode.SUBTRACT)

    # F10_s6 → F10_t5 (cut)
    with BuildSketch(Plane.XZ.offset(-5.25)):
        with BuildLine():
            ThreePointArc((7, -45), (6.2928932188, -45.2928932188), (6, -46))
            Line((6, -46), (6, -45))
            Line((6, -45), (7, -45))
        make_face()
        with BuildLine():
            ThreePointArc((-7, -45), (-6.2928932188, -45.2928932188), (-6, -46))
            Line((-6, -46), (-6, -45))
            Line((-6, -45), (-7, -45))
        make_face()
    extrude(amount=F10_T5_DEPTH, mode=Mode.SUBTRACT)

    # F10_s8 → F10_t7 (cut)
    with BuildSketch(Plane.YZ.offset(-6)):
        with BuildLine():
            ThreePointArc((-6.25, -45), (-5.5428932188, -45.2928932188), (-5.25, -46))
            Line((-5.25, -46), (-5.25, -45))
            Line((-5.25, -45), (-6.25, -45))
        make_face()
        with BuildLine():
            ThreePointArc((6.25, -45), (5.5428932188, -45.2928932188), (5.25, -46))
            Line((5.25, -46), (5.25, -45))
            Line((5.25, -45), (6.25, -45))
        make_face()
    extrude(amount=F10_T7_DEPTH, mode=Mode.SUBTRACT)


with BuildPart() as f10_tool11:
    # F10_s12 → F10_t13 (new body)
    with BuildSketch(Plane.XZ.offset(7.75)):
        with BuildLine():
            ThreePointArc((7, -45), (6.2928932188, -45.2928932188), (6, -46))
            Line((6, -46), (6, -45))
            Line((6, -45), (7, -45))
        make_face()
    extrude(amount=-F10_T13_DEPTH)

    split(bisect_by=Plane.XZ.offset(5.25), keep=Keep.TOP)


with BuildPart() as f10_tool15:
    # F10_s16 → F10_t17 (new body)
    with BuildSketch(Plane.YZ.offset(-6)):
        with BuildLine():
            ThreePointArc((-6.25, -45), (-5.5428932188, -45.2928932188), (-5.25, -46))
            Line((-5.25, -46), (-5.25, -45))
            Line((-5.25, -45), (-6.25, -45))
        make_face()
    extrude(amount=F10_T17_DEPTH)

    split(bisect_by=Plane.YZ.offset(6), keep=Keep.TOP)


with BuildPart() as f10_tool11_1:
    add(f10_tool11.part)

    # F10_t19: intersect F10_tool15
    add(f10_tool15.part, mode=Mode.INTERSECT)


with BuildPart() as f7_1:
    add(f7.part)

    # F10_t9: cut F10_tool11
    add(f10_tool11_1.part, mode=Mode.SUBTRACT)


with BuildPart() as f10_tool22:
    # F10_s23 → F10_t24 (new body)
    with BuildSketch(Plane.XZ.offset(5.25)):
        with BuildLine():
            ThreePointArc((7, -45), (6.2928932188, -45.2928932188), (6, -46))
            Line((6, -46), (6, -45))
            Line((6, -45), (7, -45))
        make_face()
    extrude(amount=-F10_T24_DEPTH)

    split(bisect_by=Plane.XZ.offset(-5.25), keep=Keep.BOTTOM)


with BuildPart() as f10_tool26:
    # F10_s27 → F10_t28 (new body)
    with BuildSketch(Plane.YZ.offset(8.5)):
        with BuildLine():
            ThreePointArc((6.25, -45), (5.5428932188, -45.2928932188), (5.25, -46))
            Line((5.25, -46), (5.25, -45))
            Line((5.25, -45), (6.25, -45))
        make_face()
    extrude(amount=-F10_T28_DEPTH)

    split(bisect_by=Plane.YZ.offset(6), keep=Keep.TOP)


with BuildPart() as f10_tool22_1:
    add(f10_tool22.part)

    # F10_t30: intersect F10_tool26
    add(f10_tool26.part, mode=Mode.INTERSECT)


with BuildPart() as f7_2:
    add(f7_1.part)

    # F10_t20: cut F10_tool22
    add(f10_tool22_1.part, mode=Mode.SUBTRACT)


with BuildPart() as f10_tool33:
    # F10_s34 → F10_t35 (new body)
    with BuildSketch(Plane.YZ.offset(-8.5)):
        with BuildLine():
            ThreePointArc((-6.25, -45), (-5.5428932188, -45.2928932188), (-5.25, -46))
            Line((-5.25, -46), (-5.25, -45))
            Line((-5.25, -45), (-6.25, -45))
        make_face()
    extrude(amount=F10_T35_DEPTH)

    split(bisect_by=Plane.YZ.offset(-6), keep=Keep.BOTTOM)


with BuildPart() as f10_tool37:
    # F10_s38 → F10_t39 (new body)
    with BuildSketch(Plane.XZ.offset(-5.25)):
        with BuildLine():
            ThreePointArc((-7, -45), (-6.2928932188, -45.2928932188), (-6, -46))
            Line((-6, -46), (-6, -45))
            Line((-6, -45), (-7, -45))
        make_face()
    extrude(amount=F10_T39_DEPTH)

    split(bisect_by=Plane.XZ.offset(5.25), keep=Keep.TOP)


with BuildPart() as f10_tool33_1:
    add(f10_tool33.part)

    # F10_t41: intersect F10_tool37
    add(f10_tool37.part, mode=Mode.INTERSECT)


with BuildPart() as f7_3:
    add(f7_2.part)

    # F10_t31: cut F10_tool33
    add(f10_tool33_1.part, mode=Mode.SUBTRACT)


with BuildPart() as f10_tool44:
    # F10_s45 → F10_t46 (new body)
    with BuildSketch(Plane.XZ.offset(-7.75)):
        with BuildLine():
            ThreePointArc((-7, -45), (-6.2928932188, -45.2928932188), (-6, -46))
            Line((-6, -46), (-6, -45))
            Line((-6, -45), (-7, -45))
        make_face()
    extrude(amount=F10_T46_DEPTH)

    split(bisect_by=Plane.XZ.offset(-5.25), keep=Keep.BOTTOM)


with BuildPart() as f10_tool48:
    # F10_s49 → F10_t50 (new body)
    with BuildSketch(Plane.YZ.offset(6)):
        with BuildLine():
            ThreePointArc((6.25, -45), (5.5428932188, -45.2928932188), (5.25, -46))
            Line((5.25, -46), (5.25, -45))
            Line((5.25, -45), (6.25, -45))
        make_face()
    extrude(amount=-F10_T50_DEPTH)

    split(bisect_by=Plane.YZ.offset(-6), keep=Keep.BOTTOM)


with BuildPart() as f10_tool44_1:
    add(f10_tool44.part)

    # F10_t52: intersect F10_tool48
    add(f10_tool48.part, mode=Mode.INTERSECT)


with BuildPart() as f7_4:
    add(f7_3.part)

    # F10_t42: cut F10_tool44
    add(f10_tool44_1.part, mode=Mode.SUBTRACT)


solid = Compound([f1.part, f3.part, f7_4.part])
